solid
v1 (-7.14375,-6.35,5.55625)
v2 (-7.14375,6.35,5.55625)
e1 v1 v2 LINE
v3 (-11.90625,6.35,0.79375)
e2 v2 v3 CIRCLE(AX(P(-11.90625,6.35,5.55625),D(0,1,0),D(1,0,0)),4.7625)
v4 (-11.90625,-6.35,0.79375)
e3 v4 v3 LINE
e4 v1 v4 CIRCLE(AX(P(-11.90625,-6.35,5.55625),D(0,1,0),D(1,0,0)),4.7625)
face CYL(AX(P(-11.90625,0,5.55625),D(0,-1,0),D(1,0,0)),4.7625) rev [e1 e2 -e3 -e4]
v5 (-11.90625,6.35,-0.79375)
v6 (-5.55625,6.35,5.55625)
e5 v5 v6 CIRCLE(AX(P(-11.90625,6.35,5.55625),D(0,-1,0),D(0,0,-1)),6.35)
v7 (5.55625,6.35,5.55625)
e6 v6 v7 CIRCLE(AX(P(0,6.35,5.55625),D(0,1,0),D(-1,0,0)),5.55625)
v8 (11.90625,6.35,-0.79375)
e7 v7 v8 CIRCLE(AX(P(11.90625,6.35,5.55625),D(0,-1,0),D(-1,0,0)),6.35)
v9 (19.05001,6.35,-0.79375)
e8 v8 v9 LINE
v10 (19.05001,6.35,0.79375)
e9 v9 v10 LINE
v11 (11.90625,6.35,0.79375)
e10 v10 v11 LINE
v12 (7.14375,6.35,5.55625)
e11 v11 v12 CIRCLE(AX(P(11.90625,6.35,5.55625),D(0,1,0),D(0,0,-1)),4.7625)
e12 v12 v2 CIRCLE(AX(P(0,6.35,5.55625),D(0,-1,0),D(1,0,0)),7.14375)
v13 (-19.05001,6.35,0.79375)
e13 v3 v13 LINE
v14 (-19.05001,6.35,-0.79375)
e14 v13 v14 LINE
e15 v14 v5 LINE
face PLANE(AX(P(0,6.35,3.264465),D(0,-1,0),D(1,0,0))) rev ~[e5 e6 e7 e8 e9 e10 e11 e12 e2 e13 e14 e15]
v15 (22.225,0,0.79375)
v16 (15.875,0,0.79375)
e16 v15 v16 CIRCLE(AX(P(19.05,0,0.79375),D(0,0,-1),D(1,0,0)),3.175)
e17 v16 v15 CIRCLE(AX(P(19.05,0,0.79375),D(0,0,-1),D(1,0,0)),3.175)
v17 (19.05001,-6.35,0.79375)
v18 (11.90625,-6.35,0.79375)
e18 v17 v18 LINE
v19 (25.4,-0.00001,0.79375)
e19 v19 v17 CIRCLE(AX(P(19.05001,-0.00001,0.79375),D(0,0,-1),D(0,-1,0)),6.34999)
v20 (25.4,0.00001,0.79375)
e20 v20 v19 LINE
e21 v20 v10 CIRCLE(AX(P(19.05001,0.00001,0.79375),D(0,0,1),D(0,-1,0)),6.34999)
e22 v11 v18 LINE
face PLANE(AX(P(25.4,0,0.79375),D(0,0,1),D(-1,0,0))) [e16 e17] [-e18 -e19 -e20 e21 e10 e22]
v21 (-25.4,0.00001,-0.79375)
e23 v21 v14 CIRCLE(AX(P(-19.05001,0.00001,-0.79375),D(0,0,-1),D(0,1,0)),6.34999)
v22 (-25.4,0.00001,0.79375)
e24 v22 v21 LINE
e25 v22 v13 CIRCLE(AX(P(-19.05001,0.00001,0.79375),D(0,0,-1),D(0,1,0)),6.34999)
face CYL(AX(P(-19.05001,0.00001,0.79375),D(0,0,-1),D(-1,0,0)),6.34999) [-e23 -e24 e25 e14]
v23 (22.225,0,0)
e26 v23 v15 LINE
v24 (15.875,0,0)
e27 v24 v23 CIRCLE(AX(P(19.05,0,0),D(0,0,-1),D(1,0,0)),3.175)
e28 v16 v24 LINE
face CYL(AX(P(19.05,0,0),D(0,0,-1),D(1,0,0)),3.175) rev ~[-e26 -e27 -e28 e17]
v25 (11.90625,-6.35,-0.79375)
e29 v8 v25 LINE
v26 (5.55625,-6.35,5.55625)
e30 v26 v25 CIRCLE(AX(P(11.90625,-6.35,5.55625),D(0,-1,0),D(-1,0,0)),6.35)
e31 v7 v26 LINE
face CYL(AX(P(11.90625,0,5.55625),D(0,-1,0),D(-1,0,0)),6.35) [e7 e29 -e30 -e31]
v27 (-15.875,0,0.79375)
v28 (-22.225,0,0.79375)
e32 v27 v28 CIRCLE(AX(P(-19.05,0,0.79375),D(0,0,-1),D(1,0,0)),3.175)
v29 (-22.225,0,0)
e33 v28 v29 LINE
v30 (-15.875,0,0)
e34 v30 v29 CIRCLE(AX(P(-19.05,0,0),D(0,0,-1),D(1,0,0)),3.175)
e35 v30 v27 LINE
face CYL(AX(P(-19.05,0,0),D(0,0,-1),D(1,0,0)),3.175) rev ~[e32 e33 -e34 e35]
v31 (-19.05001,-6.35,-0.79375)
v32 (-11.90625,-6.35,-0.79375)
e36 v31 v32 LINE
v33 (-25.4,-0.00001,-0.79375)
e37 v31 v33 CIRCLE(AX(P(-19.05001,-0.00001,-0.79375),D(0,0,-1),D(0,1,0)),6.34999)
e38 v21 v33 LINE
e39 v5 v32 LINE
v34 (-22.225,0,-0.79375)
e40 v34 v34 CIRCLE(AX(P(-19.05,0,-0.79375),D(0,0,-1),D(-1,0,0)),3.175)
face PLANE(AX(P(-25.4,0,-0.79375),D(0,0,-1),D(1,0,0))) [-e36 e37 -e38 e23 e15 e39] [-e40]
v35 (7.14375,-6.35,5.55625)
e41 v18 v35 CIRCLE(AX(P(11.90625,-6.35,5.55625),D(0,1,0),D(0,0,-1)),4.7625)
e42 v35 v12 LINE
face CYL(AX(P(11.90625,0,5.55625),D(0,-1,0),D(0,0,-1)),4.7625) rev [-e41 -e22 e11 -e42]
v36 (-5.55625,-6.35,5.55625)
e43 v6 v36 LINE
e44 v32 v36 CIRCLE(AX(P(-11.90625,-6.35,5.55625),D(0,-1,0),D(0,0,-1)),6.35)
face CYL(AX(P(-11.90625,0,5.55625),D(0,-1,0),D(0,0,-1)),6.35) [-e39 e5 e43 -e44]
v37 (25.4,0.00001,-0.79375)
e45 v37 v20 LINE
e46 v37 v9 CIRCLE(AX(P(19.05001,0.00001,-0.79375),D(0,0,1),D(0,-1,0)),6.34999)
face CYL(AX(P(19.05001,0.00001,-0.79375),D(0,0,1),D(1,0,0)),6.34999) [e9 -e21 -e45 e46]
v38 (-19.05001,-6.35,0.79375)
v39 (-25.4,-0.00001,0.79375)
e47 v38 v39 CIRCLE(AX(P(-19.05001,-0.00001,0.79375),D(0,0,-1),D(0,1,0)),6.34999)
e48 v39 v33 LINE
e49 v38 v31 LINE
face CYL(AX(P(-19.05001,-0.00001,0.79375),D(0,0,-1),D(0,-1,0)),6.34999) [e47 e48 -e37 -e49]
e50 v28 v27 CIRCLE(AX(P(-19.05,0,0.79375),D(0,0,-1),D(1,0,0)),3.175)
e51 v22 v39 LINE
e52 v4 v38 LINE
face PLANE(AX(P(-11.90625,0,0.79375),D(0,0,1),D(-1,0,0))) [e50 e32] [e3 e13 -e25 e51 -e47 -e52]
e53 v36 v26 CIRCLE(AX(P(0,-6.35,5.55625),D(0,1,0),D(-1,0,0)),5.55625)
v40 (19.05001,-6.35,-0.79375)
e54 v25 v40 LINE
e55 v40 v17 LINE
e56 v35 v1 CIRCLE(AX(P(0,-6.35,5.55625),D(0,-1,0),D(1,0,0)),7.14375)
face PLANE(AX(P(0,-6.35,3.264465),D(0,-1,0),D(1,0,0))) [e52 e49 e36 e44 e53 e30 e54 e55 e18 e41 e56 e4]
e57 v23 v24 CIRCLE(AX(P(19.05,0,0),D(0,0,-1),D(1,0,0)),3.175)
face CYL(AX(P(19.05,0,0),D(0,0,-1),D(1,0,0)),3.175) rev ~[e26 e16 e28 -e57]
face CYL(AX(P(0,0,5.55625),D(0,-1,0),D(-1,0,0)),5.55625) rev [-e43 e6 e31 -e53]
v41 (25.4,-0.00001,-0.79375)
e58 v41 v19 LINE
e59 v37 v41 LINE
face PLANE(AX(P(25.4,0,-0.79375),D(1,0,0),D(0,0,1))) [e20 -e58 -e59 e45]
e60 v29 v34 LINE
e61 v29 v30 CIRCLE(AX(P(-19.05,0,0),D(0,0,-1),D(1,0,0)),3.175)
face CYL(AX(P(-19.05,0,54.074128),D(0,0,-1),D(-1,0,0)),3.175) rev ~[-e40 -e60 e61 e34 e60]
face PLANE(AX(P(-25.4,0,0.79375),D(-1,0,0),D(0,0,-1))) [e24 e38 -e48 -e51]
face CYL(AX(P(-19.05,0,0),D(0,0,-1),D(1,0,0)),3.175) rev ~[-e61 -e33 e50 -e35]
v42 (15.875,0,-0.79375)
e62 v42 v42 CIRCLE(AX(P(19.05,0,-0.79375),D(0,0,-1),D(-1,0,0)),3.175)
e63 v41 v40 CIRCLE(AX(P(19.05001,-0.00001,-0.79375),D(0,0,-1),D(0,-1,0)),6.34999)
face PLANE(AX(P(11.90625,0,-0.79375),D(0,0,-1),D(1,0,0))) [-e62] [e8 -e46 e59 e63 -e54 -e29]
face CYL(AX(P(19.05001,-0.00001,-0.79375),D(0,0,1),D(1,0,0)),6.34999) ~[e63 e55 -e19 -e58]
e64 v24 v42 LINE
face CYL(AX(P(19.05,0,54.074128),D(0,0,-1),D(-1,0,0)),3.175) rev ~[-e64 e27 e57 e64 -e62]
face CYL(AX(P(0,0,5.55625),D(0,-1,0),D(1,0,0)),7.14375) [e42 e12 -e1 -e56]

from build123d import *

# Parameters (mm, degrees)
F1_DEPTH = 6.35
F2_R     = 6.34999
F4_D     = 6.35
F4_DEPTH = 12.701
F5_D     = 6.35


# Not quite as in the source:
# - a fillet or chamfer is up to 0.001 mm smaller than in the source, because OpenCascade refuses the exact size


with BuildPart() as f1:
    # F0 (on Front) → F1 (new body, symmetric)
    with BuildSketch(Plane.XZ):
        with BuildLine():
            Line((-11.90625, 0.79375), (-25.4, 0.79375))
            Line((-25.4, 0.79375), (-25.4, -0.79375))
            Line((-25.4, -0.79375), (-11.90625, -0.79375))
            ThreePointArc((-11.90625, -0.79375), (-7.4161219395, 1.0661219395), (-5.55625, 5.55625))
            ThreePointArc((-5.55625, 5.55625), (0, 11.1125), (5.55625, 5.55625))
            ThreePointArc((5.55625, 5.55625), (7.4161219395, 1.0661219395), (11.90625, -0.79375))
            Line((11.90625, -0.79375), (25.4, -0.79375))
            Line((25.4, -0.79375), (25.4, 0.79375))
            Line((25.4, 0.79375), (11.90625, 0.79375))
            ThreePointArc((11.90625, 0.79375), (8.5386539546, 2.1886539546), (7.14375, 5.55625))
            ThreePointArc((7.14375, 5.55625), (0, 12.7), (-7.14375, 5.55625))
            ThreePointArc((-7.14375, 5.55625), (-8.5386539546, 2.1886539546), (-11.90625, 0.79375))
        make_face()
    extrude(amount=F1_DEPTH, both=True)

    # F2 (radius 6.35 in the source; OpenCascade refuses exactly that, so slightly less here)
    f2_edges = [f1.edges().sort_by_distance(p)[0] for p in [
        (25.4, -6.35, 0),
        (25.4, 6.35, 0),
        (-25.4, -6.35, 0),
        (-25.4, 6.35, 0),
    ]]
    fillet(f2_edges, radius=F2_R)

    # F4 (through all, one way)
    with BuildSketch(Plane(origin=(0, 0, 0), x_dir=(1, 0, 0), z_dir=(0, 0, -1))):
        with Locations((-19.05, 0), (19.05, 0)):
            Circle(F4_D / 2)
    extrude(amount=-F4_DEPTH, mode=Mode.SUBTRACT)

    # F5 (through all)
    with Locations(Plane.XY):
        with Locations((-19.05, 0), (19.05, 0)):
            Hole(F5_D / 2)


solid = f1.part
